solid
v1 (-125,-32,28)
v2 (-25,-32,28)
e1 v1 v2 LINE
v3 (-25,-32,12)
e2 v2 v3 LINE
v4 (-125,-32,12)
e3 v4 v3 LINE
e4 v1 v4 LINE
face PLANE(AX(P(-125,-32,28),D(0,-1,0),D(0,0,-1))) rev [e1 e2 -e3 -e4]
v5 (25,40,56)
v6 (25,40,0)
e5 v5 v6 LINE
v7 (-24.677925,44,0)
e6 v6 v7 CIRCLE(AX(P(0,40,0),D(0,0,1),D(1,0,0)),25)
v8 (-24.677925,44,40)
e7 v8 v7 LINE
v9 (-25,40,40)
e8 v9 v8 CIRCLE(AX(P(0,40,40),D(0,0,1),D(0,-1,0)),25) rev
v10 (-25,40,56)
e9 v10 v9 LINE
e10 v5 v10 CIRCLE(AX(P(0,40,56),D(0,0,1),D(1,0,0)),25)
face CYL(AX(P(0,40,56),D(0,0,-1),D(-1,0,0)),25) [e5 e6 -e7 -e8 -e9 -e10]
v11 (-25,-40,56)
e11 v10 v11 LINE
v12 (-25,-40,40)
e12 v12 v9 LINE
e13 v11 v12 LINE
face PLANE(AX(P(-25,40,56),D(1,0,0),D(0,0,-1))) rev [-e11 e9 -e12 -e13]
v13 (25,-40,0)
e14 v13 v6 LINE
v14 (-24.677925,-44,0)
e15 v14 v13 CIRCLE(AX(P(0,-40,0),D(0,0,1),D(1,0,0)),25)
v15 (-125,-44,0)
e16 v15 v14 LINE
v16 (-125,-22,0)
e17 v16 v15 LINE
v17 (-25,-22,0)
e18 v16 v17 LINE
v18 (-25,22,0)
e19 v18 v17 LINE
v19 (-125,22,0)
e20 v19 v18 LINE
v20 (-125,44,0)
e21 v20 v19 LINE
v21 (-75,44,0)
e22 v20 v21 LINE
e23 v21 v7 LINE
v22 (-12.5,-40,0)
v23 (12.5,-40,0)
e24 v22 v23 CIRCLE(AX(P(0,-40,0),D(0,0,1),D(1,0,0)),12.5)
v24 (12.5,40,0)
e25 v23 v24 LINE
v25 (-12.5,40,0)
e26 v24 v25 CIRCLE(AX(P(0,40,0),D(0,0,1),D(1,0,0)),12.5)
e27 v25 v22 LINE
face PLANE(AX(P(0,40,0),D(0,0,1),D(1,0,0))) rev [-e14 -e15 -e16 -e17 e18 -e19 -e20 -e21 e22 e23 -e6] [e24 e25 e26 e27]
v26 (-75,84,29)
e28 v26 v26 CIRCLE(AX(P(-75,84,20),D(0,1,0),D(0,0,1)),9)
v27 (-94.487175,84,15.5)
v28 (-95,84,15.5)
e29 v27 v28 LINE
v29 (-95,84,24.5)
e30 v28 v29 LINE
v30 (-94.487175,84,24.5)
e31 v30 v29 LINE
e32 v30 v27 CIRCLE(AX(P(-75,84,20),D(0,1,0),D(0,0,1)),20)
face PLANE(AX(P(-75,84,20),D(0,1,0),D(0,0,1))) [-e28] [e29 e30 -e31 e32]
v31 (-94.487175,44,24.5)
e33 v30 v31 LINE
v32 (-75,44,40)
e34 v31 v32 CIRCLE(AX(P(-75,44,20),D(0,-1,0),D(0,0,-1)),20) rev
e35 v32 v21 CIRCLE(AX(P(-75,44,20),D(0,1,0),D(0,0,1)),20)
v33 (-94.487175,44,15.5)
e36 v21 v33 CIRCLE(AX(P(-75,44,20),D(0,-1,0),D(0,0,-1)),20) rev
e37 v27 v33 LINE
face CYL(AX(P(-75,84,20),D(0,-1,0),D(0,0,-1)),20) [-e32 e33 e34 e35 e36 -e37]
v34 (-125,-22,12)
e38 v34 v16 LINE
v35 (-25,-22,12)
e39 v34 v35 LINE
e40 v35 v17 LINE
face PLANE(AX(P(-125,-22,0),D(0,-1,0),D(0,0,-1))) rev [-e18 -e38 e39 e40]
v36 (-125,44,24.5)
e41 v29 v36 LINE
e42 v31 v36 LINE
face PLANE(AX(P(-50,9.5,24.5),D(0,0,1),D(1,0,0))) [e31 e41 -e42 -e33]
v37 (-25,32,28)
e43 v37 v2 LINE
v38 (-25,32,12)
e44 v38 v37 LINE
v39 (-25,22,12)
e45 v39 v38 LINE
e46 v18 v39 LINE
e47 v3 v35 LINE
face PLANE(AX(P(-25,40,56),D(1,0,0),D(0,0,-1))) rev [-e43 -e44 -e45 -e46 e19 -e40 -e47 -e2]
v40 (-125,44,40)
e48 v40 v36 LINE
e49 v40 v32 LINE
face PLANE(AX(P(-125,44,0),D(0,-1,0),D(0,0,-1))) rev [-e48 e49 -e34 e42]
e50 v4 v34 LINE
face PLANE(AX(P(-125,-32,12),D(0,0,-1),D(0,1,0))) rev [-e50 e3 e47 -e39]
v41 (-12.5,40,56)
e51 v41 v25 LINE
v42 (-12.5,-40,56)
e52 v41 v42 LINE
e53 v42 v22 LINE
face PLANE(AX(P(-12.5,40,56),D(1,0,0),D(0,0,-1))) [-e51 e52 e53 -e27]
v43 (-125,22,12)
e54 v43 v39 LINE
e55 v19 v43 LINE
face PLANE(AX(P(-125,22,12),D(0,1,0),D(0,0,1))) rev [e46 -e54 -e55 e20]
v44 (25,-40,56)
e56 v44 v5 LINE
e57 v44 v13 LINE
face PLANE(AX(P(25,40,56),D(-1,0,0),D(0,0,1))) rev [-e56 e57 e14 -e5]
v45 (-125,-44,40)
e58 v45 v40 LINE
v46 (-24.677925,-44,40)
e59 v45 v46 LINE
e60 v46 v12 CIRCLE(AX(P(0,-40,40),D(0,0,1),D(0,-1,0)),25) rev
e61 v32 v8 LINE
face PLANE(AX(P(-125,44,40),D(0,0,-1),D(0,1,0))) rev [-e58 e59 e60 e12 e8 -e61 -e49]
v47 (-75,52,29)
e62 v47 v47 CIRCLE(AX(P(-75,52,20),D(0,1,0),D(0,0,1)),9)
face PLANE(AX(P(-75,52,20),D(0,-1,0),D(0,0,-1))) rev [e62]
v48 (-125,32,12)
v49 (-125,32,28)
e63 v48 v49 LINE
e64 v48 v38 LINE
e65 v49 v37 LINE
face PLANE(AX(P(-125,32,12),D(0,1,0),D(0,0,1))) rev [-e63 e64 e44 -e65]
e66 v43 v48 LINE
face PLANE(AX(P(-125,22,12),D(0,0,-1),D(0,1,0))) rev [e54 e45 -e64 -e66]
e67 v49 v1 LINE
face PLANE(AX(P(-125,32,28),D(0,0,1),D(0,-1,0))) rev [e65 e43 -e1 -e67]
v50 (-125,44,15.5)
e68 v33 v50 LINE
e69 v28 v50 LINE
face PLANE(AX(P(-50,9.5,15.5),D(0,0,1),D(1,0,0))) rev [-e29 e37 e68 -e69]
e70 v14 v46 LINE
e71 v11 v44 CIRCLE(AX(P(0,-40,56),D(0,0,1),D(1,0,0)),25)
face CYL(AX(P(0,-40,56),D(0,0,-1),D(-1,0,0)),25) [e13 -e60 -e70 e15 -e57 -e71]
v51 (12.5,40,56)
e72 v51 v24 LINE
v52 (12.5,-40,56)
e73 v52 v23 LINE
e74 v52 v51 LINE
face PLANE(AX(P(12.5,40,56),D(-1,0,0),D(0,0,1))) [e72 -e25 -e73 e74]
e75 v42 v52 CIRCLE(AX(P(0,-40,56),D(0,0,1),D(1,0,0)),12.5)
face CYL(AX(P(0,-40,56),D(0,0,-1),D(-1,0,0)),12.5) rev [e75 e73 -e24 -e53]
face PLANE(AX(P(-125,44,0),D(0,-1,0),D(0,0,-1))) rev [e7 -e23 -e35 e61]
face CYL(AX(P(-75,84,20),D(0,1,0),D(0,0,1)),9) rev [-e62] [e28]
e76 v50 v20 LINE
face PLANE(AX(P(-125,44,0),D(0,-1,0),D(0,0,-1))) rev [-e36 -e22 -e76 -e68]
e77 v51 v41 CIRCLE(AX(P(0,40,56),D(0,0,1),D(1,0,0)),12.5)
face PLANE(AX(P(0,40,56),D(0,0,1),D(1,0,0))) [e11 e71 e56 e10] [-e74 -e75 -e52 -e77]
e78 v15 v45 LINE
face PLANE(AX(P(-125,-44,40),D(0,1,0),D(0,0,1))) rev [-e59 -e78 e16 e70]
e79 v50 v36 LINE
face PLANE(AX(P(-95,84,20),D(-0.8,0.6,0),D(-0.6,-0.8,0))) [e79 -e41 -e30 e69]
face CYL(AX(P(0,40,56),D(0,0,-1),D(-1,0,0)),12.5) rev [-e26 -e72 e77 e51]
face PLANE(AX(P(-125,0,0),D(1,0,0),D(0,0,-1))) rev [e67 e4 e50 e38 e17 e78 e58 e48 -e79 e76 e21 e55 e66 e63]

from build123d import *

# Parameters (mm, degrees)
BOSS_EXTRUDE1_DEPTH        = 56
BOSS_EXTRUDE2_START        = -0.322075
BOSS_EXTRUDE2_DEPTH        = 100.322075
SKETCH5_R                  = 20
BOSS_EXTRUDE3_DEPTH        = 40
RIB7_START                 = -4.5
RIB7_DEPTH                 = 9
F_12_0MM_DOWEL_HOLE1_D     = 18
F_12_0MM_DOWEL_HOLE1_DEPTH = 32


with BuildPart() as part:
    # Sketch3 → Boss-Extrude1 (new body)
    with BuildSketch(Plane.XY):
        with BuildLine():
            Line((25, 40), (25, -40))
            ThreePointArc((25, -40), (0, -65), (-25, -40))
            Line((-25, -40), (-25, 40))
            ThreePointArc((-25, 40), (0, 65), (25, 40))
        make_face()
        with BuildLine():
            Line((12.5, 40), (12.5, -40))
            ThreePointArc((12.5, -40), (0, -52.5), (-12.5, -40))
            Line((-12.5, -40), (-12.5, 40))
            ThreePointArc((-12.5, 40), (0, 52.5), (12.5, 40))
        make_face(mode=Mode.SUBTRACT)
    extrude(amount=BOSS_EXTRUDE1_DEPTH)

    # Sketch4 → Boss-Extrude2 (add)
    with BuildSketch(Plane.ZY.offset(25).offset(BOSS_EXTRUDE2_START)):
        Polygon((12, 22), (0, 22), (0, 44), (40, 44), (40, -44), (0, -44), (0, -22), (12, -22), (12, -32), (28, -32), (28, 32), (12, 32), align=None)
    extrude(amount=BOSS_EXTRUDE2_DEPTH)

    # Sketch5 → Boss-Extrude3 (add)
    with BuildSketch(Plane(origin=(0, 44, 0), x_dir=(1, 0, 0), z_dir=(0, 1, 0))):
        with Locations(Location((-75, -20, 0), (0, 0, 270))):
            Circle(SKETCH5_R)
    extrude(amount=BOSS_EXTRUDE3_DEPTH)

    # Rib7: read off the stored shape, not the designer's step
    # Rib7 outline → Rib7 (add)
    with BuildSketch(Plane.XY.offset(20).offset(RIB7_START)):
        Polygon((-125, 44), (-94.48717527, 44), (-94.48717527, 84), (-95, 84), align=None)
    extrude(amount=RIB7_DEPTH)

    # Ø12.0mm Dowel Hole1
    with Locations(Plane(origin=(-75, 84, 20), x_dir=(0, 0, 1), z_dir=(0, 1, 0))):
        with Locations((0, 0)):
            Hole(F_12_0MM_DOWEL_HOLE1_D / 2, depth=F_12_0MM_DOWEL_HOLE1_DEPTH)


solid = part.part
